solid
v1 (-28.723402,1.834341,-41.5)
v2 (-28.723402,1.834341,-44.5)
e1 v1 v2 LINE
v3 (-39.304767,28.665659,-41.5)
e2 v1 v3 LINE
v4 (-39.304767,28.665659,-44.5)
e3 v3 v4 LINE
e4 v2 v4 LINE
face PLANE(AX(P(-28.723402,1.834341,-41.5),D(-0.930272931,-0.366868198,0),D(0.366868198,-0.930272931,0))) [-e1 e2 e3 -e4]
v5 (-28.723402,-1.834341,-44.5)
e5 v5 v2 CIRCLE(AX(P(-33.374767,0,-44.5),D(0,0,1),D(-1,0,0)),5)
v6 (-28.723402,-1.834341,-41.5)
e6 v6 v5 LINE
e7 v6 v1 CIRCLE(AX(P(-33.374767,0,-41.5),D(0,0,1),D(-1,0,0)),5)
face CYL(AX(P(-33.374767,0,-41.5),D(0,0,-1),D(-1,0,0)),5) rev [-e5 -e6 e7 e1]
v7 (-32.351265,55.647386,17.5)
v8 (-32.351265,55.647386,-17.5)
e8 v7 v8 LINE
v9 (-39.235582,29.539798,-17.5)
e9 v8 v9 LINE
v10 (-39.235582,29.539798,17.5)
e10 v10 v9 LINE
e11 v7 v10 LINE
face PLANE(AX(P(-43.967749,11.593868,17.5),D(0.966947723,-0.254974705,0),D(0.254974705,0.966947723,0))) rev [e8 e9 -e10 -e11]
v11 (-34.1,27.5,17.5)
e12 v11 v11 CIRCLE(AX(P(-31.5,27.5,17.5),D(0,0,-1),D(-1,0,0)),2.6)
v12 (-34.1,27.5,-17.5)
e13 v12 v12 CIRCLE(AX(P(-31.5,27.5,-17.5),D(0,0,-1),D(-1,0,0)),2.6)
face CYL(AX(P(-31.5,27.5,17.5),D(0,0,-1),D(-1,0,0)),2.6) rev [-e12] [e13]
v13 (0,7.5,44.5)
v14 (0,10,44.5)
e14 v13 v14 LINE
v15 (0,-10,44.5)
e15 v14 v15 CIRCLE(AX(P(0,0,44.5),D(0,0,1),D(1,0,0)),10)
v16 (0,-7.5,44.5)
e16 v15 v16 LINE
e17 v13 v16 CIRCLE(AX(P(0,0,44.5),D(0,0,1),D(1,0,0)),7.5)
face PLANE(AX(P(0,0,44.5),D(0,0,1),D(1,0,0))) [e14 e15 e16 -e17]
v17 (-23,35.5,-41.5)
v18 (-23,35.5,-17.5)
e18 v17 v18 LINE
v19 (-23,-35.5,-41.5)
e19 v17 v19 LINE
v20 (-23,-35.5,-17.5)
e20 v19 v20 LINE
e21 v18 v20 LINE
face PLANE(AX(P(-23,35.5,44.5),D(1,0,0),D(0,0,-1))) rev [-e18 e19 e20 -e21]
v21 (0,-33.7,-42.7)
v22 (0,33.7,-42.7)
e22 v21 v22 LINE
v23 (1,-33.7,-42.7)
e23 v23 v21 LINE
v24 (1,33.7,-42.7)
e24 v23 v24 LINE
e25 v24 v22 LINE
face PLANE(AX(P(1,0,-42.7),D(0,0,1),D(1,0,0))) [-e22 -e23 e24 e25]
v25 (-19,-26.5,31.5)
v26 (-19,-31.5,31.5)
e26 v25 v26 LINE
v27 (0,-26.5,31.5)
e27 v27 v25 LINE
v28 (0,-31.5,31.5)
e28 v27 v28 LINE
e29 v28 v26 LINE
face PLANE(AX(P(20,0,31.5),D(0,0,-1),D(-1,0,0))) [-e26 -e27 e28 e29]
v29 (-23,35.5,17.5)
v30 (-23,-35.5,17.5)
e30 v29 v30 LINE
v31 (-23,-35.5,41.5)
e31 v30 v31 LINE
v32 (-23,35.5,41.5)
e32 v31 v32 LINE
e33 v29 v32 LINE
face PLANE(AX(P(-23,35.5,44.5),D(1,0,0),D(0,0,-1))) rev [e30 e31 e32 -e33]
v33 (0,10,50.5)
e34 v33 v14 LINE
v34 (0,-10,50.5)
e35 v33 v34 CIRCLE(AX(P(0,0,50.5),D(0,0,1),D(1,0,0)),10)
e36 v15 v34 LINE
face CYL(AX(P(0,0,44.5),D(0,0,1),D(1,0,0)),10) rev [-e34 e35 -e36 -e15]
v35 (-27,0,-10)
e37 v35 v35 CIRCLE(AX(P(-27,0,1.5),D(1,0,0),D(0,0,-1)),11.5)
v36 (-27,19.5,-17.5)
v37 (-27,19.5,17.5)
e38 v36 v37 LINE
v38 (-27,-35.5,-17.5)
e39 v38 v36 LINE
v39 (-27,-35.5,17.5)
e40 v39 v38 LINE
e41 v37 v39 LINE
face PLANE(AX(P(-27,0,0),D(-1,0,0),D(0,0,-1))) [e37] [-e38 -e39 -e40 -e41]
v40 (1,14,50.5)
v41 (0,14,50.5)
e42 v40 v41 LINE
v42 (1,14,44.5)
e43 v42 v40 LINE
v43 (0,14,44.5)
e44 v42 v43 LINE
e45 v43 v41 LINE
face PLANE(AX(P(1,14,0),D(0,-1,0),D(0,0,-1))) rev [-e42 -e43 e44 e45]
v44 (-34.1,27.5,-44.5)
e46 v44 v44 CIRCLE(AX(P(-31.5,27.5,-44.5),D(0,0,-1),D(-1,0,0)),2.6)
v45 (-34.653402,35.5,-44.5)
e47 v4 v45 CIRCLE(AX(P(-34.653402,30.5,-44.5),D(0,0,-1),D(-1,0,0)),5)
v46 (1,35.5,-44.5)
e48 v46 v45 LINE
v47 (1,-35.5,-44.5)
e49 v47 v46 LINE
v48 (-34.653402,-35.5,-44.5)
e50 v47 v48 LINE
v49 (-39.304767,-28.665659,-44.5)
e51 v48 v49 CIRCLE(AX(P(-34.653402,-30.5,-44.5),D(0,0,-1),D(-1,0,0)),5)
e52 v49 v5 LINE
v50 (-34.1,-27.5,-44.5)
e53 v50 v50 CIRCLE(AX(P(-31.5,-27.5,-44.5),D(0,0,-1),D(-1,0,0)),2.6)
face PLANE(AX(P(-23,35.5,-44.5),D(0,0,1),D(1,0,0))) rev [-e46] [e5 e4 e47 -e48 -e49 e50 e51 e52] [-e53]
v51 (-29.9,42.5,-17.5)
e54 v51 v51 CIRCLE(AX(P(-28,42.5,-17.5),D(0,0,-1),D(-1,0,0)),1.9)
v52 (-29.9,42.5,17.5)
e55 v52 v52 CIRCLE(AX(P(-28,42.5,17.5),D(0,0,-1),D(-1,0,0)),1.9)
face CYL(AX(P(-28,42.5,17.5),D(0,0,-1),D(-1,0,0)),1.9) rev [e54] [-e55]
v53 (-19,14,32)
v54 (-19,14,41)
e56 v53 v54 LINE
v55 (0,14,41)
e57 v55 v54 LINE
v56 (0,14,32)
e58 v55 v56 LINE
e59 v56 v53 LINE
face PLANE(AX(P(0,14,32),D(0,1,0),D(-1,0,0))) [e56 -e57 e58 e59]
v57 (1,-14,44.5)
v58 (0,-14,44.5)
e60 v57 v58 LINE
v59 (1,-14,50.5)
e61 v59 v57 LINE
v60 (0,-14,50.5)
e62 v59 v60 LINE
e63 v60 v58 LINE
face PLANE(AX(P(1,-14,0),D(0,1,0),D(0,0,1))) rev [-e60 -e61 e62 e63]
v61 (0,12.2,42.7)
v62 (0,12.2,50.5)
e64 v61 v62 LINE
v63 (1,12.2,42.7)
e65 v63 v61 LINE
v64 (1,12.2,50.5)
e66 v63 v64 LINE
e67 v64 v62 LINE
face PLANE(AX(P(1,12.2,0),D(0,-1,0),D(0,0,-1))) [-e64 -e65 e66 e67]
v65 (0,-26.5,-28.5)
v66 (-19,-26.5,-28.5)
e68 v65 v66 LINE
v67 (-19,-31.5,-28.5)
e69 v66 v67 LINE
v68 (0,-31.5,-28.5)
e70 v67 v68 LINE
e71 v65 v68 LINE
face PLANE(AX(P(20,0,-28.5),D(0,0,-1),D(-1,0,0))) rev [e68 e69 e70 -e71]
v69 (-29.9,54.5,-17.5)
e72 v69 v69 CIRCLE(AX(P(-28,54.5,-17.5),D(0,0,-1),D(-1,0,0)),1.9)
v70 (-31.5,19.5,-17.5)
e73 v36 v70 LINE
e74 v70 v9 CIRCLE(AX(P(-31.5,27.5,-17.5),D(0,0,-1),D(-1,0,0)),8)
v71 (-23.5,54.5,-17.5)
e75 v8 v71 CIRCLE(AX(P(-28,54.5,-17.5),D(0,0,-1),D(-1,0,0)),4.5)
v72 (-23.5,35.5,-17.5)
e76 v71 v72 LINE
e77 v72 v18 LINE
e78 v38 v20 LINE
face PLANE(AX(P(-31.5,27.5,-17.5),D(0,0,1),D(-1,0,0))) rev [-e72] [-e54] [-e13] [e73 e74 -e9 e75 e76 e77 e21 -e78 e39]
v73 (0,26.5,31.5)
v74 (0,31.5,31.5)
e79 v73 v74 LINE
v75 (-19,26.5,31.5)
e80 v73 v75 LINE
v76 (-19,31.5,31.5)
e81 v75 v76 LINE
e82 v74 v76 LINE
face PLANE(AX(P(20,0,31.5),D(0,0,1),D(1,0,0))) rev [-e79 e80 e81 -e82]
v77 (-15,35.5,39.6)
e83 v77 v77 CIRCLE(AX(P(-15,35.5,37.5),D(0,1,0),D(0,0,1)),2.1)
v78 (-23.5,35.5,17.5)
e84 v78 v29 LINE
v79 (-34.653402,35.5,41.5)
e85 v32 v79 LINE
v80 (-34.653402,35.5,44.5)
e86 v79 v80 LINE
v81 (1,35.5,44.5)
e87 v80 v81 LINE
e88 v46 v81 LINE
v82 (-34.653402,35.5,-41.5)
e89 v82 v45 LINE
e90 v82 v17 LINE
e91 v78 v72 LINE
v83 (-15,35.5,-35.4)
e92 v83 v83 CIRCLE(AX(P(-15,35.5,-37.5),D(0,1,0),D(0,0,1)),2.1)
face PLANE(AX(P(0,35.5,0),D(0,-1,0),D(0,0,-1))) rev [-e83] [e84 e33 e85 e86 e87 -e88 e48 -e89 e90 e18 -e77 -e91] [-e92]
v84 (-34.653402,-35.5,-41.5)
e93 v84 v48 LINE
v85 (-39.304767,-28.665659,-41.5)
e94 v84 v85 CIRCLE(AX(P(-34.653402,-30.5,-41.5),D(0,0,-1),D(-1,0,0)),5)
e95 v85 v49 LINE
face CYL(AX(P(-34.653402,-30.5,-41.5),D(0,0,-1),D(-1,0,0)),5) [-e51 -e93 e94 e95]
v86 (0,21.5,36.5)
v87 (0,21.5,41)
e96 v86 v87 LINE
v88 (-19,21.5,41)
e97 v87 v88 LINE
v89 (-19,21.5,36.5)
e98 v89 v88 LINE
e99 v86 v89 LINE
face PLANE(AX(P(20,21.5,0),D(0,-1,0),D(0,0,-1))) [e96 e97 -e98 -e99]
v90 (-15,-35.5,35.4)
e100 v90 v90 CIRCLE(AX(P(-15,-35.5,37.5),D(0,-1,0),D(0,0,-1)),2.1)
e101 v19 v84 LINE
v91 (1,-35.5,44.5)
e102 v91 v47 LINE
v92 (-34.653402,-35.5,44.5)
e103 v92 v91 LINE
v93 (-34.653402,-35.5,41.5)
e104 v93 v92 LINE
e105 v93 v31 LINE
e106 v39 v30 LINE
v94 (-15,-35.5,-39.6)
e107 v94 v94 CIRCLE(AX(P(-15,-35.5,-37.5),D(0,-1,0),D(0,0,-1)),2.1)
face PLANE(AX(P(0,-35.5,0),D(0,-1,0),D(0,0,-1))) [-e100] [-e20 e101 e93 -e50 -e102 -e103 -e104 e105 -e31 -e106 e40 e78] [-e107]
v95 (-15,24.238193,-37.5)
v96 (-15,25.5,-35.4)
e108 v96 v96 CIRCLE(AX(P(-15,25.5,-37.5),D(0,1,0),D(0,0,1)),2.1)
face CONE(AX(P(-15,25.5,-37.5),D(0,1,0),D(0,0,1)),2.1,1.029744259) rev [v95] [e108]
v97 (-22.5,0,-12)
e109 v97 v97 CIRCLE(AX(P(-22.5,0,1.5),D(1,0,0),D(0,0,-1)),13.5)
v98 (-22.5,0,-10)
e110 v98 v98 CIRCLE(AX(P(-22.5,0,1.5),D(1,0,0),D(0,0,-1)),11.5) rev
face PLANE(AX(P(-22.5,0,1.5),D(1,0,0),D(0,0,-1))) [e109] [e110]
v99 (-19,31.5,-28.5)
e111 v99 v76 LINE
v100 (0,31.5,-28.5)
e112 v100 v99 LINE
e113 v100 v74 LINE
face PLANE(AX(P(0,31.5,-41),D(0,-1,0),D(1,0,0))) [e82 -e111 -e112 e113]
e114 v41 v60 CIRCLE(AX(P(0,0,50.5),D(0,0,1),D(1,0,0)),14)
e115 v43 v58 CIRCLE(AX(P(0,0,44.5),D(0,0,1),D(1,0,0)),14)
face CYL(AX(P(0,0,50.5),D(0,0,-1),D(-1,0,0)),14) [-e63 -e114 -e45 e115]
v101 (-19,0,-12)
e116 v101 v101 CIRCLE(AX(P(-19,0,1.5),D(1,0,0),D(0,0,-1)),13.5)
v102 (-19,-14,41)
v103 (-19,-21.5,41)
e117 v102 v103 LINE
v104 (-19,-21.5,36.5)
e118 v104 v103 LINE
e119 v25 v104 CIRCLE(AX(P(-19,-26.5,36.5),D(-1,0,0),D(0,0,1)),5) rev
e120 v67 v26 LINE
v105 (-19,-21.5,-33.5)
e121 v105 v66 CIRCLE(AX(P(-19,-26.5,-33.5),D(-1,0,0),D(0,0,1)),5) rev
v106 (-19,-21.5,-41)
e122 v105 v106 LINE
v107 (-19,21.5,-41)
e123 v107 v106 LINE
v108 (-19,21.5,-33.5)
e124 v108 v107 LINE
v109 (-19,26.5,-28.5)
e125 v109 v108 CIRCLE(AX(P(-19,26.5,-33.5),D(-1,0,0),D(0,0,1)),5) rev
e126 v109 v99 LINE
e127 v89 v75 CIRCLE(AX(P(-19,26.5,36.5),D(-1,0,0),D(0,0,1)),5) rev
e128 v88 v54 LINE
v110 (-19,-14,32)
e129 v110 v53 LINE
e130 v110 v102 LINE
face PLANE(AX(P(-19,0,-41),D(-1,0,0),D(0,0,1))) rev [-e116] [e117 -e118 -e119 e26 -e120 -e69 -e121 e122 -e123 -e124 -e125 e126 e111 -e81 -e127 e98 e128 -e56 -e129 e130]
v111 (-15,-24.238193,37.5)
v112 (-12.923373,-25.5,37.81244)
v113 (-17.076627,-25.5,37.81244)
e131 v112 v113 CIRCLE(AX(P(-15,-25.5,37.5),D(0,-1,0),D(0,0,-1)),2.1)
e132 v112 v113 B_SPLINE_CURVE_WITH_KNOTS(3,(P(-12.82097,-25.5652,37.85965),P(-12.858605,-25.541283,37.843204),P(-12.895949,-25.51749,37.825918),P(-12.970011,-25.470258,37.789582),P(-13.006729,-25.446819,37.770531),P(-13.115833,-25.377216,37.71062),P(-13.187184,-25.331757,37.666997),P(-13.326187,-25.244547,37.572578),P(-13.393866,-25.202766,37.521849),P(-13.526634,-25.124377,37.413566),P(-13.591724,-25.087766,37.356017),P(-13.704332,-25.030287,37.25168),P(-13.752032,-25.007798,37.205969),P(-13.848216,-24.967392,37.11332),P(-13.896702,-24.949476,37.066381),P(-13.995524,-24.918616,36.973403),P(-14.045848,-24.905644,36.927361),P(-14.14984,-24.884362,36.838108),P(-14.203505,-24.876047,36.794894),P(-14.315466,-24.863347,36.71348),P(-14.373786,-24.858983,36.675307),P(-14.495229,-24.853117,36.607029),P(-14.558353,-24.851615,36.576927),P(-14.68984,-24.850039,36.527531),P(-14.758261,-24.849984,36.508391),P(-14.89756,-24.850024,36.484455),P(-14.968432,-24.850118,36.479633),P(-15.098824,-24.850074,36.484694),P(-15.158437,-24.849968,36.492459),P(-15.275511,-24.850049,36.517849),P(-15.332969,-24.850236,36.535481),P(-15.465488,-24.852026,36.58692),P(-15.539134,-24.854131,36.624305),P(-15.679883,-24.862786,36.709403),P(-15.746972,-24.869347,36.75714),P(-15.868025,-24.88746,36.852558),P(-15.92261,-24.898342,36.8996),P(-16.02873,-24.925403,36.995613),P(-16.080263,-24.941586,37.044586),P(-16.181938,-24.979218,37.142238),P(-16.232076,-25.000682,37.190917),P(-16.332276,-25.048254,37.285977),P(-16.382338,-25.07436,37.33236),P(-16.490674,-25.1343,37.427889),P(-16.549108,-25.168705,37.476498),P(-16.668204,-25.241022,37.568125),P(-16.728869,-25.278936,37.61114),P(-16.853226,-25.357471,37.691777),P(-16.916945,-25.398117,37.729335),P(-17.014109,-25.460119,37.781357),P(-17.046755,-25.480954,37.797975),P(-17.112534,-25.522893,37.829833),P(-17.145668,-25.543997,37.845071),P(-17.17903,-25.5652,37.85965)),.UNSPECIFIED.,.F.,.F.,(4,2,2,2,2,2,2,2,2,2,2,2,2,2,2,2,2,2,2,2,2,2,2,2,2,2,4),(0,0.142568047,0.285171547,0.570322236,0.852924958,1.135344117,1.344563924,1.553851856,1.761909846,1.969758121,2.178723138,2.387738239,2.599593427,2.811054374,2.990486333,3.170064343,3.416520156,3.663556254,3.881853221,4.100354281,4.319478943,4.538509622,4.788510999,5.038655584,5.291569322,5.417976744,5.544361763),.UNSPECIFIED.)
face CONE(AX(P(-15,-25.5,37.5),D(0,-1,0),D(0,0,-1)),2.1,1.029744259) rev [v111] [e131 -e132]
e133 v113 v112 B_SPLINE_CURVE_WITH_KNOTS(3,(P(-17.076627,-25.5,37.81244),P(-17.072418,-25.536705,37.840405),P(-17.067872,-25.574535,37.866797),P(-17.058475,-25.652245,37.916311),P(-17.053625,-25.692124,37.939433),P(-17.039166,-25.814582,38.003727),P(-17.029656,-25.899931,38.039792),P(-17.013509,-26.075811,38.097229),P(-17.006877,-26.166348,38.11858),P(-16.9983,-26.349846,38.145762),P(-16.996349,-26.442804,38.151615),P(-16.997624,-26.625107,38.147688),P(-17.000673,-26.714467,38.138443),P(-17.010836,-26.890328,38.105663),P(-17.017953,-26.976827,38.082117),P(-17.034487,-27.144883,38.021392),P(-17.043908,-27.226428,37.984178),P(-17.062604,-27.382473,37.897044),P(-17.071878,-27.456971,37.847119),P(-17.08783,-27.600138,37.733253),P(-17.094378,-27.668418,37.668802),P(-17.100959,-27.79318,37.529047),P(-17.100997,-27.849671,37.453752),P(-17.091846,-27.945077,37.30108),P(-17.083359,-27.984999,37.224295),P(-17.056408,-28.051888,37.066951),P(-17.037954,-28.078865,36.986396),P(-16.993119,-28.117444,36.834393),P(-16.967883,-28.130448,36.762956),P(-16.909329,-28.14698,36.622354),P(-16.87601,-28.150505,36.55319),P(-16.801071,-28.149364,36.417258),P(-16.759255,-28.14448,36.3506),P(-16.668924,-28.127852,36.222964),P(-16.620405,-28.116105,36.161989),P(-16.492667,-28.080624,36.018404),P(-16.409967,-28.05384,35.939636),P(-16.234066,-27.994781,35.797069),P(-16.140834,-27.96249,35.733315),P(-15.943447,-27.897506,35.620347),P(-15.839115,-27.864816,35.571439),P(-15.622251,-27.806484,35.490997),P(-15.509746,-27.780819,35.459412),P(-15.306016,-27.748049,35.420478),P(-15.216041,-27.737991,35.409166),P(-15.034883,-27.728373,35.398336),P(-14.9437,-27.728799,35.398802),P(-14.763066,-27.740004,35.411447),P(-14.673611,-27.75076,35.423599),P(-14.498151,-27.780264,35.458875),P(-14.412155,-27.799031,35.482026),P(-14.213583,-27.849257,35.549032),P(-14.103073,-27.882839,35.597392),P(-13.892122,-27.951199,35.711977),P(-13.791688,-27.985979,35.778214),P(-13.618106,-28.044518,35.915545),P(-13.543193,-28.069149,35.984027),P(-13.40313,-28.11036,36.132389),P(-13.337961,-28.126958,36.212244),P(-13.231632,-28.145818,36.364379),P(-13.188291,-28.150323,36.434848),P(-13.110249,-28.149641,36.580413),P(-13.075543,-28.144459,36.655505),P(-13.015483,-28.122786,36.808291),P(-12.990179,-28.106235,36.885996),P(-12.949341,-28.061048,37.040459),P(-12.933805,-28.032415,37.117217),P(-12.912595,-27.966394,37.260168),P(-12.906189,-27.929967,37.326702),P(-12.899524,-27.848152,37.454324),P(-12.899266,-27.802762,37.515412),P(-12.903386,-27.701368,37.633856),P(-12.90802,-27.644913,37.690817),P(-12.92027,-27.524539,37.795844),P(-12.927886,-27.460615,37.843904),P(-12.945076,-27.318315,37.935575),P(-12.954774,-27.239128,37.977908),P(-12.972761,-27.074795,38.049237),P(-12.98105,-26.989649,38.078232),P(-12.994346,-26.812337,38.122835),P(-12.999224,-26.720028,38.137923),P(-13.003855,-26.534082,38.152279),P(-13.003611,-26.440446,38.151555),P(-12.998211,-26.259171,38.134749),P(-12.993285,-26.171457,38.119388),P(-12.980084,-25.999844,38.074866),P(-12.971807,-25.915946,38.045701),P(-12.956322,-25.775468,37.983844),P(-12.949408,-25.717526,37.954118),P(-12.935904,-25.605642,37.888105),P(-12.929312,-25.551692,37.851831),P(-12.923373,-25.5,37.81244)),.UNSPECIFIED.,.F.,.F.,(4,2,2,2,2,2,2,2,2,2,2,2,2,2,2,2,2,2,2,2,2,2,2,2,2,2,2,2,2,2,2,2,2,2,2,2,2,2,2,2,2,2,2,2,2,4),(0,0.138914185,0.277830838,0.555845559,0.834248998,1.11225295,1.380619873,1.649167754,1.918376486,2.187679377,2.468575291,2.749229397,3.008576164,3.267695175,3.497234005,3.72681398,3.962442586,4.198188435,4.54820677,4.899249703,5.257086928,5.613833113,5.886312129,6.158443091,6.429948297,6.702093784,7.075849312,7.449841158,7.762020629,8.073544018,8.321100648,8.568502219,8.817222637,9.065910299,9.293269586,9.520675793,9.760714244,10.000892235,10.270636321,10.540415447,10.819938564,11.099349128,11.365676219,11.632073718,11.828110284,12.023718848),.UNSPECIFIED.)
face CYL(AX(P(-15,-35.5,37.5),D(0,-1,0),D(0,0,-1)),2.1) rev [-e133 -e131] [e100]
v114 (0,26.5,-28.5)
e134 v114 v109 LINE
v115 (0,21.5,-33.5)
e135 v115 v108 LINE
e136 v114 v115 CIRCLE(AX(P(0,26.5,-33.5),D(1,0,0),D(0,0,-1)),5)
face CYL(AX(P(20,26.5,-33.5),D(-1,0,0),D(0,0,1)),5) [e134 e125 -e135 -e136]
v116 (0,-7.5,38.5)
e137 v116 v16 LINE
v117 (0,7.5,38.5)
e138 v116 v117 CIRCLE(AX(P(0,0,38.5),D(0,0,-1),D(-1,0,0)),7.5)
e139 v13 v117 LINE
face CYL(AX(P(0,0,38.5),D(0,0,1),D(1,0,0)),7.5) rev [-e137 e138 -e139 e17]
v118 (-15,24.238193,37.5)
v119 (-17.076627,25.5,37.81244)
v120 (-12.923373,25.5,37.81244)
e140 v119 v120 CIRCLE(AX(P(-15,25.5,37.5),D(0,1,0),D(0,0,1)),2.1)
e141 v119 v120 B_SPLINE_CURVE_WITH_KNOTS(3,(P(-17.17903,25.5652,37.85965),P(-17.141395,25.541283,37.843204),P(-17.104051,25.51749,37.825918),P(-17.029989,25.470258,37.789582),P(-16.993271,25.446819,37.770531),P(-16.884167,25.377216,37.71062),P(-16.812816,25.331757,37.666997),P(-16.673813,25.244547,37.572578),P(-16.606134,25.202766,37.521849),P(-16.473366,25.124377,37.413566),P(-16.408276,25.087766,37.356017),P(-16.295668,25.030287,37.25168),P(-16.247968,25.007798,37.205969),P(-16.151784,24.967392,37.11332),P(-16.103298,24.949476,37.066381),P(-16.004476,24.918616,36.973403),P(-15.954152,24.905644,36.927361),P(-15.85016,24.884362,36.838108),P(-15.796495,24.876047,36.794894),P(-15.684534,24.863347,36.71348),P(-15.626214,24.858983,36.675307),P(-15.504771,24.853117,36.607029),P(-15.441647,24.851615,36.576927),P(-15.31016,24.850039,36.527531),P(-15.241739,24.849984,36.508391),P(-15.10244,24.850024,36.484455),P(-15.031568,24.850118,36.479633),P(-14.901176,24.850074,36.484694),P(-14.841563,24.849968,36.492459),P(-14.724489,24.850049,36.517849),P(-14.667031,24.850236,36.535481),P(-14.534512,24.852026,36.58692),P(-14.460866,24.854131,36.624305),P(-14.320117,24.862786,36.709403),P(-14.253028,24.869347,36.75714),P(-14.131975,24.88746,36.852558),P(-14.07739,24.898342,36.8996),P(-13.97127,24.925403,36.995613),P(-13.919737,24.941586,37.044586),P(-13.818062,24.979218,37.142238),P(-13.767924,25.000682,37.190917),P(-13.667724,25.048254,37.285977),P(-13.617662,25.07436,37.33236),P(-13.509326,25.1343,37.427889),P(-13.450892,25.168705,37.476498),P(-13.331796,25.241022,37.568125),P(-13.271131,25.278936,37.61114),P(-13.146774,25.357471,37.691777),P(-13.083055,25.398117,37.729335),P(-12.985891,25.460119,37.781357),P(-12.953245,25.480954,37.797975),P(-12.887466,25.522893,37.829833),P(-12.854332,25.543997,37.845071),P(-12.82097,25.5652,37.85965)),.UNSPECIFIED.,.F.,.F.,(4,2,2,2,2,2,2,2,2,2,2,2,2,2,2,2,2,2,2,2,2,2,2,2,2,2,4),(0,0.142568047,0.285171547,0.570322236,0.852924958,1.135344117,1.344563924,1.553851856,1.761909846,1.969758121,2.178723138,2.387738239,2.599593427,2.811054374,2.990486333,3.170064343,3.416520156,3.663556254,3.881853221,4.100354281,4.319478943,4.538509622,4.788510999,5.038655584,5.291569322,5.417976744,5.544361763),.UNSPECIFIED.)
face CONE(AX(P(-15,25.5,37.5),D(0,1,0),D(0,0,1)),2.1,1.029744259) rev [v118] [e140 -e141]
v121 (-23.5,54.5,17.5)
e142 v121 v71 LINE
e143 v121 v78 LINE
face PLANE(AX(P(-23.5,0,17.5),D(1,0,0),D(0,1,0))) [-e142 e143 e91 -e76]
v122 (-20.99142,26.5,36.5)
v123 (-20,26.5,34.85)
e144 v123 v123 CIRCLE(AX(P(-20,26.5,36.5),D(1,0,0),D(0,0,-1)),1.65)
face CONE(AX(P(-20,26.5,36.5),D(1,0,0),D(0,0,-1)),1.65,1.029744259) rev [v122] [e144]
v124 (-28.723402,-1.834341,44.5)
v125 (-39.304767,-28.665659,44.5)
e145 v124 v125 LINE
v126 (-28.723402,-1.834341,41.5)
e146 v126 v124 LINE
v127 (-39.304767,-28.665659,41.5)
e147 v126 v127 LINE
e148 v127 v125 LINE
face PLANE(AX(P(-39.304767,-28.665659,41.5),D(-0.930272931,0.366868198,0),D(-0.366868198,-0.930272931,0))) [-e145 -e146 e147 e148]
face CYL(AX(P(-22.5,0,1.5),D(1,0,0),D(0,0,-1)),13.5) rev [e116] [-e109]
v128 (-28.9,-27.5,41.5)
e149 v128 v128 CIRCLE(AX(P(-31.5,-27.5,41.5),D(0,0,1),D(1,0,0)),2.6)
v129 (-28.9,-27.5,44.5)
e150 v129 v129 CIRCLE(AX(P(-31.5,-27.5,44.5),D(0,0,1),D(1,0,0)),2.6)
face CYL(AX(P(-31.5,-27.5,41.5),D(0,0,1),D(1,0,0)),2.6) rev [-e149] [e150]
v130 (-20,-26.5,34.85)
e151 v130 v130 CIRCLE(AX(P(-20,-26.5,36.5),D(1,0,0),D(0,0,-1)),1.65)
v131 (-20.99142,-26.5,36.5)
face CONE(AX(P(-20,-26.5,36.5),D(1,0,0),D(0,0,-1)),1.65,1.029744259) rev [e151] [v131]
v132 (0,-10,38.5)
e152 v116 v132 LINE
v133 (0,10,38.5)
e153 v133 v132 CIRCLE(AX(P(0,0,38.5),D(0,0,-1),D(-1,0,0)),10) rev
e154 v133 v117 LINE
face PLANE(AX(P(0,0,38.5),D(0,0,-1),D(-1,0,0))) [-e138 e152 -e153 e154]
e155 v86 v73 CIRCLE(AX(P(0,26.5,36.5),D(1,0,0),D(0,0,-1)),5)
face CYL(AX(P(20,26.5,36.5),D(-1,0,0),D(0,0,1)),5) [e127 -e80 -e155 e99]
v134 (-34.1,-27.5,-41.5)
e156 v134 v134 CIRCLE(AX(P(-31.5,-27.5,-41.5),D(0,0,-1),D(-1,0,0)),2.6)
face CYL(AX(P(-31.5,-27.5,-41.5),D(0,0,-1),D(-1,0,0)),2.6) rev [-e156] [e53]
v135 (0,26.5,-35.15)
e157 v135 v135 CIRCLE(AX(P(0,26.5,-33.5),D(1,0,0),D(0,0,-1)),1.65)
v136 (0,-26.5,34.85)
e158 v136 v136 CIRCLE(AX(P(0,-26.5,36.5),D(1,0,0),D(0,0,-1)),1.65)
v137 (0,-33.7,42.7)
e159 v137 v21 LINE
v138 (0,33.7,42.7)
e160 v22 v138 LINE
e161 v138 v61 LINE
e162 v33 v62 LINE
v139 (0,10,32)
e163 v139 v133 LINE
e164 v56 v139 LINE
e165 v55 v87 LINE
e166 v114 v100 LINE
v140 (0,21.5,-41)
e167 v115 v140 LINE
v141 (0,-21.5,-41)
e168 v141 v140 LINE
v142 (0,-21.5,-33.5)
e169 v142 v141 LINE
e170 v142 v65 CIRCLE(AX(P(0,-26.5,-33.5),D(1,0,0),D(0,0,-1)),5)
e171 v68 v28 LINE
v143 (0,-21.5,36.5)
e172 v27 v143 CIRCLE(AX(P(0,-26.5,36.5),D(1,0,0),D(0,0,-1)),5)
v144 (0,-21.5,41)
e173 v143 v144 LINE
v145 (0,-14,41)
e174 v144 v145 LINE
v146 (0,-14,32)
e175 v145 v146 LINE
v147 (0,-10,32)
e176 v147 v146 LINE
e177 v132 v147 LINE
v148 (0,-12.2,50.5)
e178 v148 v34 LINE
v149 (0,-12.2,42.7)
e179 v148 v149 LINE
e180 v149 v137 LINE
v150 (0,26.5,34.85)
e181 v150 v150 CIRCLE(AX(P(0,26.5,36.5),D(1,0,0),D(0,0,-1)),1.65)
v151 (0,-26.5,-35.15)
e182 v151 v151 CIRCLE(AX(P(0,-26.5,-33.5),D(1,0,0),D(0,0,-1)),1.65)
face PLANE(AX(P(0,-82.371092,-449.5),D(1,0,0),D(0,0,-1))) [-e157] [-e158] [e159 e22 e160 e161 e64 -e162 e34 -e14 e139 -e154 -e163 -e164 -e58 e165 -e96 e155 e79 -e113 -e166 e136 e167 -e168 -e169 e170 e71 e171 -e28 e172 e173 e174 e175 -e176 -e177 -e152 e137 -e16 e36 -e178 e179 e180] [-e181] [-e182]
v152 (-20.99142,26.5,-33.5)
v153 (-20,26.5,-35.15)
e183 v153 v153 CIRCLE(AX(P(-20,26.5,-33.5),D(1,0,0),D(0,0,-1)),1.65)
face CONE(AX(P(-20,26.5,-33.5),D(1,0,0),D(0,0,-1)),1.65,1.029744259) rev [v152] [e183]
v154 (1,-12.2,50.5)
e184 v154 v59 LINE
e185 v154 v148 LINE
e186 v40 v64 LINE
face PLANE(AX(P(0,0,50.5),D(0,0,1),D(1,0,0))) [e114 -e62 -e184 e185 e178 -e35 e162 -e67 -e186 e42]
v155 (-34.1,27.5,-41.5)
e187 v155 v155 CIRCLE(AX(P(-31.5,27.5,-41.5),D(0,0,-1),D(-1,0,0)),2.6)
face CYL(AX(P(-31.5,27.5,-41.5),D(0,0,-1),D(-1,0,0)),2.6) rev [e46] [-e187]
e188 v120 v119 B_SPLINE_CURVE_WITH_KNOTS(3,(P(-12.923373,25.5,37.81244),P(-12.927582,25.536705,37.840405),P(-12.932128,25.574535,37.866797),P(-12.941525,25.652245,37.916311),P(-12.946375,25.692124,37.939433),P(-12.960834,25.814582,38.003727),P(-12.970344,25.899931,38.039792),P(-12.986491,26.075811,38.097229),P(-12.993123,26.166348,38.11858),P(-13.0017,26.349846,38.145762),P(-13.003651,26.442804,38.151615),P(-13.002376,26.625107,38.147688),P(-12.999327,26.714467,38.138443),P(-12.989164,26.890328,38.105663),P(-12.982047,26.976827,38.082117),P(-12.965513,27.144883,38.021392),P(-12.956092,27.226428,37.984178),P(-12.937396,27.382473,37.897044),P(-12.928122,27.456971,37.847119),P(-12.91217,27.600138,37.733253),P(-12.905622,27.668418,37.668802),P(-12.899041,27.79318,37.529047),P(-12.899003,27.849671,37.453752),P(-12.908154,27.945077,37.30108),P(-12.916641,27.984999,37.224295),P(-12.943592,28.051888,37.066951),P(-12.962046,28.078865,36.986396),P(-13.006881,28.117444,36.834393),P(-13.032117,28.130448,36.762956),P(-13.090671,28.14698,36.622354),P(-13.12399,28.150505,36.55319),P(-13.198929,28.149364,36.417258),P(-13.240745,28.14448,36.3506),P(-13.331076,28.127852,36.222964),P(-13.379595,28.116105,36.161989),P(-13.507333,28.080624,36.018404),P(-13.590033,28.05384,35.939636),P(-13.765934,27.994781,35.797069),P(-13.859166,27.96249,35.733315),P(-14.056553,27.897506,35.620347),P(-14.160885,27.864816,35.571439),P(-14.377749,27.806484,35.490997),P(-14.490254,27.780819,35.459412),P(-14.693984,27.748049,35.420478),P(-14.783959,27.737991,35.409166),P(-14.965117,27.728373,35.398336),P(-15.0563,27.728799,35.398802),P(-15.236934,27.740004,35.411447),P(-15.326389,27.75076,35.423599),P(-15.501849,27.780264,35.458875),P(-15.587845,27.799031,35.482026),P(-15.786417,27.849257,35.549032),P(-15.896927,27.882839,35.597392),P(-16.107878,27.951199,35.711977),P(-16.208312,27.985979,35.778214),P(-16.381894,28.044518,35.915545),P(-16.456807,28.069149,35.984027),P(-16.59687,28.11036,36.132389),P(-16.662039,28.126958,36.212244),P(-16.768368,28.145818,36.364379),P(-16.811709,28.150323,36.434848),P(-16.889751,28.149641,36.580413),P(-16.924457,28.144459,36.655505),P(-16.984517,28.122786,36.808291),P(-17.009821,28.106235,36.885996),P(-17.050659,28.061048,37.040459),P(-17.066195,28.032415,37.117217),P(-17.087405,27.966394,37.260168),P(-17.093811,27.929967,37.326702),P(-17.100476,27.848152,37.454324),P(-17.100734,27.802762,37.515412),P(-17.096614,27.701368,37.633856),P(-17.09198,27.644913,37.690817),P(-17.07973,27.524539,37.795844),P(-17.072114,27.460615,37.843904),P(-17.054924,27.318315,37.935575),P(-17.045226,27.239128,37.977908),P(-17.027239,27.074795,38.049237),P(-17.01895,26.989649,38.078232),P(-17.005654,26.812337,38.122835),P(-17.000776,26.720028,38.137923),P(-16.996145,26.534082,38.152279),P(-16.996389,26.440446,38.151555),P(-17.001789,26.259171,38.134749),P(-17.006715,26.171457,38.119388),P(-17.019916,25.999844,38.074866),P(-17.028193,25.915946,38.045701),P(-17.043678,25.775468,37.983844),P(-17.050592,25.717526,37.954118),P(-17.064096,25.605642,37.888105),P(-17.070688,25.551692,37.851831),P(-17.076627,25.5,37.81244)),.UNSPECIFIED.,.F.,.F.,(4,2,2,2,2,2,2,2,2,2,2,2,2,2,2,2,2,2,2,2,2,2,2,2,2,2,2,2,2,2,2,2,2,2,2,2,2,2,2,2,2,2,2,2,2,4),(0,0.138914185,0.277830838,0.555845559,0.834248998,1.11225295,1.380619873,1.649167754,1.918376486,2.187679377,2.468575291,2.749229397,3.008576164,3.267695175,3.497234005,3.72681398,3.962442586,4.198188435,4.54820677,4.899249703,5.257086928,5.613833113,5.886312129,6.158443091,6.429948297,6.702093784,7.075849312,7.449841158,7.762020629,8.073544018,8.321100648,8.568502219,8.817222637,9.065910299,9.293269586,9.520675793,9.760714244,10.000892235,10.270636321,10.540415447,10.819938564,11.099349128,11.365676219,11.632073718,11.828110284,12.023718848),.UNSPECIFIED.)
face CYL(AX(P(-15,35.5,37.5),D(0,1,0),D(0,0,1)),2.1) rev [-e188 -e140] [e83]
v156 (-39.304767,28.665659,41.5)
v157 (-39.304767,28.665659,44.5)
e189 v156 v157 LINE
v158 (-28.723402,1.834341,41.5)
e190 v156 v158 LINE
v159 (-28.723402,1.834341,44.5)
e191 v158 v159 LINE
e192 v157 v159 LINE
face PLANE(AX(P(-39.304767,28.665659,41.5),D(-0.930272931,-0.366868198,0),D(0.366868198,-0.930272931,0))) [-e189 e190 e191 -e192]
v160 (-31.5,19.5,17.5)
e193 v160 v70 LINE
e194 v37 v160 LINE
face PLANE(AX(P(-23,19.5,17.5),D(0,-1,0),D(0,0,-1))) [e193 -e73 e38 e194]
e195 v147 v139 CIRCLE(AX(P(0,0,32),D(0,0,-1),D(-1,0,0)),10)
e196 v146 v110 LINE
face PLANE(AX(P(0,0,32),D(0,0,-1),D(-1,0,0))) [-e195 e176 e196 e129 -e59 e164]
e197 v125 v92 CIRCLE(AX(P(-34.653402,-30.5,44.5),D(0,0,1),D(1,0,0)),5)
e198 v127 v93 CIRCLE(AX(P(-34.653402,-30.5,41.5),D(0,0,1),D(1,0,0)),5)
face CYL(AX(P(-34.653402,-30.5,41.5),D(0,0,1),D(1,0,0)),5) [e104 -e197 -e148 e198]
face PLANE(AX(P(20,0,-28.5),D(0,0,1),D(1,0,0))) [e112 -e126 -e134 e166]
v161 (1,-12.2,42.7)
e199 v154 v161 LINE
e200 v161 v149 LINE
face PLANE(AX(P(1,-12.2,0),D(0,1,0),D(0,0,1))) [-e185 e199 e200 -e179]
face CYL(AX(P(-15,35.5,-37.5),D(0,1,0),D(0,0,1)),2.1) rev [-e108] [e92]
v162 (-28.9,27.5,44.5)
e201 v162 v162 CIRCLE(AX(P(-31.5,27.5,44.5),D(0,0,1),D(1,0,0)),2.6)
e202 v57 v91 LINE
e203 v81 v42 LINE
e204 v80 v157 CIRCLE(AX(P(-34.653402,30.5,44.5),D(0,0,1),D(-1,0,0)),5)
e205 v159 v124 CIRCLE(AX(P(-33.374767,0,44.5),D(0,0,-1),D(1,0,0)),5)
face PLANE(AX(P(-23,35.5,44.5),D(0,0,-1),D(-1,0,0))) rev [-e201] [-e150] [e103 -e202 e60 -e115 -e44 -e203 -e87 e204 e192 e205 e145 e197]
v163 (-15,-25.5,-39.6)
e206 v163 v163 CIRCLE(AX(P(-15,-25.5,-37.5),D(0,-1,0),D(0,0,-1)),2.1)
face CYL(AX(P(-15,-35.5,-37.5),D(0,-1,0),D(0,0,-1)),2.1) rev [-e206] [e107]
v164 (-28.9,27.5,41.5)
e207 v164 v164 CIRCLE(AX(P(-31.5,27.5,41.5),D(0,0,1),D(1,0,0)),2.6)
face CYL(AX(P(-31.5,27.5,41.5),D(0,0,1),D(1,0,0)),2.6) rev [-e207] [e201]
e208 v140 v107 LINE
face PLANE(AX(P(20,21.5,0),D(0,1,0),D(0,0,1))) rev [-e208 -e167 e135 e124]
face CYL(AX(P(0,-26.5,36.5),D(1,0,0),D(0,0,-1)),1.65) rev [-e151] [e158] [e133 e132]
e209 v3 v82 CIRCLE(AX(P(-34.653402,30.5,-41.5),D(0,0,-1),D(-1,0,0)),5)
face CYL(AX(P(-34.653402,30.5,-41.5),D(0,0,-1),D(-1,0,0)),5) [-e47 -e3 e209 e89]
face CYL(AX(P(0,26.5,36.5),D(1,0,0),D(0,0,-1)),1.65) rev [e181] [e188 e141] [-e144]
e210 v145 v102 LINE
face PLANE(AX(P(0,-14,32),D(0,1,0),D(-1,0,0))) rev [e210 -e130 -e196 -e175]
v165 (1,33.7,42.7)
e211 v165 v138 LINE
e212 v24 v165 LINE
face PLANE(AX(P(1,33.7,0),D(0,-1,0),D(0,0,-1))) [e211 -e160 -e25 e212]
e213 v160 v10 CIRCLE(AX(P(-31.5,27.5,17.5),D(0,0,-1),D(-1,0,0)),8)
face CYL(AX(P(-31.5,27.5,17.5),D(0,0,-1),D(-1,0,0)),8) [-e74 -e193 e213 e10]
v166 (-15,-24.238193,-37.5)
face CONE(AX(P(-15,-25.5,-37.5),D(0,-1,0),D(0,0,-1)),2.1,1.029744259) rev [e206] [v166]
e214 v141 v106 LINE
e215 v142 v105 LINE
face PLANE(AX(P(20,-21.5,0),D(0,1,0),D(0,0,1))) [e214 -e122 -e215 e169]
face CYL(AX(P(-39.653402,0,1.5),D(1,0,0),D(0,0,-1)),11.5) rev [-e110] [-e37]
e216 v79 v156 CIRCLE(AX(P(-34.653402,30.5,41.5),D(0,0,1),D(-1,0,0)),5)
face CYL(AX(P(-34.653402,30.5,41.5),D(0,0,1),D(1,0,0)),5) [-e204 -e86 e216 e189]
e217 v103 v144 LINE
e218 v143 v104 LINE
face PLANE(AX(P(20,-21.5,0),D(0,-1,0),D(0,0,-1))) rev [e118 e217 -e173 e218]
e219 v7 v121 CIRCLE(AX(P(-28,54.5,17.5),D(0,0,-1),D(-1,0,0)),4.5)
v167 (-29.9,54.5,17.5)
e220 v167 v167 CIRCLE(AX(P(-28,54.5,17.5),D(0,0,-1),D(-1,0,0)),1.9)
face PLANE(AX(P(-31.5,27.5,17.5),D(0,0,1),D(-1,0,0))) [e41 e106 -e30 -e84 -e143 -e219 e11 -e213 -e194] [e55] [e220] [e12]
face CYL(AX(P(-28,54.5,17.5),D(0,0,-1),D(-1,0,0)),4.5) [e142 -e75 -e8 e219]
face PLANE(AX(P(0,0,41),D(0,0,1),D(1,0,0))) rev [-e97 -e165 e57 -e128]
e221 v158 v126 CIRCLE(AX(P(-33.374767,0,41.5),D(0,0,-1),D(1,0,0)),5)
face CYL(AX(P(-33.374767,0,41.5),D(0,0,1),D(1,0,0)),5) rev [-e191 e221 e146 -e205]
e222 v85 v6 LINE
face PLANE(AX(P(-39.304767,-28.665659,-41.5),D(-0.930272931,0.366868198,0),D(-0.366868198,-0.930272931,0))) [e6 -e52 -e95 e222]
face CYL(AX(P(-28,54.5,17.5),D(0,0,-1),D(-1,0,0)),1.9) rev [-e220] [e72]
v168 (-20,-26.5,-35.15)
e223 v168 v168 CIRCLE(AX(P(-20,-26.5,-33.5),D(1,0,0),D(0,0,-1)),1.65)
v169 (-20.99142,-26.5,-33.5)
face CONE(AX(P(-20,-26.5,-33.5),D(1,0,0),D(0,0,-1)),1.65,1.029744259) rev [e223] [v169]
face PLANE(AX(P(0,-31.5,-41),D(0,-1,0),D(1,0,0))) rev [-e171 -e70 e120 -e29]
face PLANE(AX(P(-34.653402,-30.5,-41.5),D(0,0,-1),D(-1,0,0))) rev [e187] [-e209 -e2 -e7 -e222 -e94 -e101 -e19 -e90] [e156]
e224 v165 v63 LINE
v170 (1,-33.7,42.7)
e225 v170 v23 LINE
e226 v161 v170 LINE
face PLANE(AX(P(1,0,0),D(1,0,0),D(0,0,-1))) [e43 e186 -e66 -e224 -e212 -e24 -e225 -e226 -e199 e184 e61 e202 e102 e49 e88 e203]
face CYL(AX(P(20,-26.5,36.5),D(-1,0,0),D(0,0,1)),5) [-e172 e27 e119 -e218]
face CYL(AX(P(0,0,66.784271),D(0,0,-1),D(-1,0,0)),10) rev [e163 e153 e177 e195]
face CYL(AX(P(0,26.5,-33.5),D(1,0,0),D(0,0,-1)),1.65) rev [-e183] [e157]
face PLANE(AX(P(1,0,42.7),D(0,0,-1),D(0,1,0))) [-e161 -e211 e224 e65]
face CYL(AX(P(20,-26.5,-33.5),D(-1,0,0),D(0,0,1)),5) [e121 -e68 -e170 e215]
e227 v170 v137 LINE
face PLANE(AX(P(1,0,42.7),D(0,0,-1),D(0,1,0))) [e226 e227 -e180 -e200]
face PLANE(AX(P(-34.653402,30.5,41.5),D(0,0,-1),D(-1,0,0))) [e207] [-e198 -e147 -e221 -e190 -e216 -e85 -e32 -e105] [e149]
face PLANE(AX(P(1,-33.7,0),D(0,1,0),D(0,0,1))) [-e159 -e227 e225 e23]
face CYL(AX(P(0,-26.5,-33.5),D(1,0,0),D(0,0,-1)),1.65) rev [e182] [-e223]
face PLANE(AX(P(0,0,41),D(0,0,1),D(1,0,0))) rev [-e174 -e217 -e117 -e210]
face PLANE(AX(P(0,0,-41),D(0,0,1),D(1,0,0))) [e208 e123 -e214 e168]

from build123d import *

# Parameters (mm, degrees)
SKETCH_1_W             = 46
SKETCH_1_H             = 89
EXTRUDE_1_DEPTH        = 35.5
SKETCH_3_R             = 2.6
EXTRUDE_2_DEPTH        = 3
EXTRUDE_START          = -3
SKETCH_4_R             = 2.6
EXTRUDE_3_DEPTH        = 3
SKETCH_5_R             = 14
EXTRUDE_4_DEPTH        = 6
SKETCH_6_R             = 11.5
CUT_EXTRUDE_1_DEPTH    = 88.954242748
SKETCH_7_R             = 2.6
EXTRUDE_5_DEPTH        = 17.5
SKETCH_8_R             = 1.9
SKETCH_8_R_2           = 4.5
EXTRUDE_6_DEPTH        = 17.5
SKETCH_9_R             = 2
CUT_EXTRUDE_2_DEPTH    = 115.249255194
SKETCH_10_R            = 10
CUT_EXTRUDE_3_DEPTH    = 6
SKETCH_11_R            = 7.5
CUT_EXTRUDE_4_DEPTH    = 6
SKETCH_12_R            = 9.5
CUT_EXTRUDE_5_DEPTH    = 6
SKETCH_15_W            = 38
SKETCH_15_H            = 63
CUT_EXTRUDE_7_DEPTH    = 41
EXTRUDE_START_2        = 9
SKETCH_16_R            = 14
SKETCH_16_R_2          = 9.5
EXTRUDE_7_DEPTH        = 9
SKETCH_17_R            = 5
EXTRUDE_10_DEPTH       = 20
EXTRUDE_START_3        = 4
SKETCH_18_W            = 35
SKETCH_18_H            = 55
SKETCH_18_R            = 11.5
EXTRUDE_11_DEPTH       = 4
SKETCH_19_R            = 13.5
CUT_EXTRUDE_10_DEPTH   = 4
CUT_EXTRUDE_START      = -3.5
SKETCH_20_R            = 13.5
CUT_EXTRUDE_11_DEPTH   = 3.5
SKETCH_22_W            = 152.706647992
SKETCH_22_H            = 164.74218493
CUT_EXTRUDE_14_DEPTH   = 500
EXTRUDE_12_DEPTH       = 1
HOLE_WIZARD_M4_1_D     = 3.3
HOLE_WIZARD_M4_1_DEPTH = 20
HOLE_WIZARD_M4_1_TIP   = 0.991420021
EXTRUDE_14_DEPTH       = 2.5
CUT_EXTRUDE_START_2    = -6.5
SKETCH_28_R            = 10
CUT_EXTRUDE_15_DEPTH   = 6.5


# Read off the part's stored shape, not the designer's step: M5 螺纹孔1
with BuildPart() as part:
    # 草图1 → 凸台-拉伸1 (new, symmetric)
    with BuildSketch(Plane(origin=(0, 0, 0), x_dir=(1, 0, 0), z_dir=(0, 1, 0))):
        Rectangle(SKETCH_1_W, SKETCH_1_H)
    extrude(amount=EXTRUDE_1_DEPTH, both=True)

    # 草图3 → 凸台-拉伸2 (add)
    # profile 1 of 2: a face of its own
    with BuildSketch(Plane.XY.offset(44.5)):
        with BuildLine():
            Line((23, 35.5), (34.653402281, 35.5))
            ThreePointArc((34.653402281, 35.5), (38.786905937, 33.313209471), (39.304766934, 28.66565901))
            Line((39.304766934, 28.66565901), (28.72340208, 1.83434099))
            ThreePointArc((28.72340208, 1.83434099), (28.374766733, 0), (28.72340208, -1.83434099))
            Line((28.72340208, -1.83434099), (39.304766934, -28.66565901))
            ThreePointArc((39.304766934, -28.66565901), (38.786905937, -33.313209471), (34.653402281, -35.5))
            Line((34.653402281, -35.5), (23, -35.5))
            Line((23, -35.5), (23, 35.5))
        make_face()
        with Locations((31.5, 27.5)):
            Circle(SKETCH_3_R, mode=Mode.SUBTRACT)
        with Locations((31.5, -27.5)):
            Circle(SKETCH_3_R, mode=Mode.SUBTRACT)
    # profile 2 of 2: a face of its own
    with BuildSketch(Plane.XY.offset(44.5)):
        with BuildLine():
            Line((-23, -35.5), (-23, 35.5))
            Line((-23, 35.5), (-34.653402281, 35.5))
            ThreePointArc((-34.653402281, 35.5), (-38.786905937, 33.313209471), (-39.304766934, 28.66565901))
            Line((-39.304766934, 28.66565901), (-28.72340208, 1.83434099))
            ThreePointArc((-28.72340208, 1.83434099), (-28.374766733, 0), (-28.72340208, -1.83434099))
            Line((-28.72340208, -1.83434099), (-39.304766934, -28.66565901))
            ThreePointArc((-39.304766934, -28.66565901), (-38.786905937, -33.313209471), (-34.653402281, -35.5))
            Line((-34.653402281, -35.5), (-23, -35.5))
        make_face()
        with Locations((-31.5, -27.5)):
            Circle(SKETCH_3_R, mode=Mode.SUBTRACT)
        with Locations((-31.5, 27.5)):
            Circle(SKETCH_3_R, mode=Mode.SUBTRACT)
    extrude(amount=-EXTRUDE_2_DEPTH)

    # 草图4 → 凸台-拉伸3 (add)
    # profile 1 of 2: a face of its own
    with BuildSketch(Plane(origin=(0, 0, -44.5), x_dir=(-1, 0, 0), z_dir=(0, 0, -1)).offset(EXTRUDE_START)):
        with BuildLine():
            Line((39.304766934, -28.66565901), (28.72340208, -1.83434099))
            ThreePointArc((28.72340208, -1.83434099), (28.374766733, 0), (28.72340208, 1.83434099))
            Line((28.72340208, 1.83434099), (39.304766934, 28.66565901))
            ThreePointArc((39.304766934, 28.66565901), (38.786905937, 33.313209471), (34.653402281, 35.5))
            Line((34.653402281, 35.5), (23, 35.5))
            Line((23, 35.5), (23, -35.5))
            Line((23, -35.5), (34.653402281, -35.5))
            ThreePointArc((34.653402281, -35.5), (38.786905937, -33.313209471), (39.304766934, -28.66565901))
        make_face()
        with Locations(Location((31.5, 27.5, 0), (0, 0, 180))):
            Circle(SKETCH_4_R, mode=Mode.SUBTRACT)
        with Locations(Location((31.5, -27.5, 0), (0, 0, 180))):
            Circle(SKETCH_4_R, mode=Mode.SUBTRACT)
    # profile 2 of 2: a face of its own
    with BuildSketch(Plane(origin=(0, 0, -44.5), x_dir=(-1, 0, 0), z_dir=(0, 0, -1)).offset(EXTRUDE_START)):
        with BuildLine():
            Line((-23, 35.5), (-34.653402281, 35.5))
            ThreePointArc((-34.653402281, 35.5), (-38.786905937, 33.313209471), (-39.304766934, 28.66565901))
            Line((-39.304766934, 28.66565901), (-28.72340208, 1.83434099))
            ThreePointArc((-28.72340208, 1.83434099), (-28.374766733, 0), (-28.72340208, -1.83434099))
            Line((-28.72340208, -1.83434099), (-39.304766934, -28.66565901))
            ThreePointArc((-39.304766934, -28.66565901), (-38.786905937, -33.313209471), (-34.653402281, -35.5))
            Line((-34.653402281, -35.5), (-23, -35.5))
            Line((-23, -35.5), (-23, 35.5))
        make_face()
        with Locations(Location((-31.5, -27.5, 0), (0, 0, 180))):
            Circle(SKETCH_4_R, mode=Mode.SUBTRACT)
        with Locations(Location((-31.5, 27.5, 0), (0, 0, 180))):
            Circle(SKETCH_4_R, mode=Mode.SUBTRACT)
    extrude(amount=EXTRUDE_3_DEPTH)

    # 草图5 → 凸台-拉伸4 (add)
    with BuildSketch(Plane.XY.offset(44.5)):
        Circle(SKETCH_5_R)
    extrude(amount=EXTRUDE_4_DEPTH)

    # 草图6 → 切除-拉伸1 (cut, through all)
    with BuildSketch(Plane(origin=(23, 0, 0), x_dir=(0, 0, -1), z_dir=(1, 0, 0))):
        with Locations((-1.5, 0)):
            Circle(SKETCH_6_R)
    extrude(amount=-CUT_EXTRUDE_1_DEPTH, mode=Mode.SUBTRACT)

    # 草图7 → 凸台-拉伸5 (add, symmetric)
    with BuildSketch(Plane.XY):
        with BuildLine():
            Line((23, 19.5), (23, 35.5))
            Line((23, 35.5), (31.5, 35.5))
            ThreePointArc((31.5, 35.5), (39.5, 27.5), (31.5, 19.5))
            Line((31.5, 19.5), (23, 19.5))
        make_face()
        with Locations((31.5, 27.5)):
            Circle(SKETCH_7_R, mode=Mode.SUBTRACT)
    extrude_5 = extrude(amount=EXTRUDE_5_DEPTH, both=True)

    # 镜向1: 凸台-拉伸5 across plane
    add(extrude_5.mirror(Plane(origin=(0, 0, 0), x_dir=(0, 0, 1), z_dir=(1, 0, 0))))

    # 草图8 → 凸台-拉伸6 (add, symmetric)
    # profile 1 of 2: a face of its own
    with BuildSketch(Plane.XY):
        with BuildLine():
            Line((39.235581788, 29.539797639), (32.351264755, 55.647386172))
            ThreePointArc((32.351264755, 55.647386172), (32.46266128, 55.078493129), (32.5, 54.5))
            ThreePointArc((32.5, 54.5), (28, 50), (23.5, 54.5))
            Line((23.5, 54.5), (23.5, 35.5))
            Line((23.5, 35.5), (31.5, 35.5))
            ThreePointArc((31.5, 35.5), (36.382705136, 33.837127942), (39.235581788, 29.539797639))
        make_face()
        with Locations((28, 42.5)):
            Circle(SKETCH_8_R, mode=Mode.SUBTRACT)
    # profile 2 of 2: a face of its own
    with BuildSketch(Plane.XY):
        with Locations((28, 54.5)):
            Circle(SKETCH_8_R_2)
        with Locations((28, 54.5)):
            Circle(SKETCH_8_R, mode=Mode.SUBTRACT)
    extrude_6 = extrude(amount=EXTRUDE_6_DEPTH, both=True)

    # 镜向2: 凸台-拉伸5, 凸台-拉伸6 across plane
    add(extrude_5.mirror(Plane(origin=(0, 0, 0), x_dir=(0, 0, 1), z_dir=(1, 0, 0))))
    add(extrude_6.mirror(Plane(origin=(0, 0, 0), x_dir=(0, 0, 1), z_dir=(1, 0, 0))))

    # 草图9 → 切除-拉伸2 (cut, through all)
    with BuildSketch(Plane.XZ.offset(35.5)):
        with Locations(Location((15, -37.5, 0), (0, 0, 270))):
            Circle(SKETCH_9_R)
        with Locations(Location((-15, -37.5, 0), (0, 0, 270))):
            Circle(SKETCH_9_R)
        with Locations(Location((-15, 37.5, 0), (0, 0, 270))):
            Circle(SKETCH_9_R)
        with Locations(Location((15, 37.5, 0), (0, 0, 270))):
            Circle(SKETCH_9_R)
    extrude(amount=-CUT_EXTRUDE_2_DEPTH, mode=Mode.SUBTRACT)

    # 草图10 → 切除-拉伸3 (cut)
    with BuildSketch(Plane.XY.offset(50.5)):
        Circle(SKETCH_10_R)
    extrude(amount=-CUT_EXTRUDE_3_DEPTH, mode=Mode.SUBTRACT)

    # 草图11 → 切除-拉伸4 (cut)
    with BuildSketch(Plane.XY.offset(44.5)):
        Circle(SKETCH_11_R)
    extrude(amount=-CUT_EXTRUDE_4_DEPTH, mode=Mode.SUBTRACT)

    # 草图12 → 切除-拉伸5 (cut)
    with BuildSketch(Plane.XY.offset(38.5)):
        Circle(SKETCH_12_R)
    extrude(amount=-CUT_EXTRUDE_5_DEPTH, mode=Mode.SUBTRACT)

    # 草图15 → 切除-拉伸7 (cut, symmetric)
    with BuildSketch(Plane.XY):
        Rectangle(SKETCH_15_W, SKETCH_15_H)
    extrude(amount=CUT_EXTRUDE_7_DEPTH, both=True, mode=Mode.SUBTRACT)

    # 草图16 → 凸台-拉伸7 (add)
    # profile 1 of 3: a face of its own
    with BuildSketch(Plane(origin=(0, 0, 41), x_dir=(-1, 0, 0), z_dir=(0, 0, -1)).offset(EXTRUDE_START_2)):
        with Locations(Location((0, 0, 0), (0, 0, 180))):
            Circle(SKETCH_16_R)
        Circle(SKETCH_16_R_2, mode=Mode.SUBTRACT)
    # profile 2 of 3: a face of its own
    with BuildSketch(Plane(origin=(0, 0, 41), x_dir=(-1, 0, 0), z_dir=(0, 0, -1)).offset(EXTRUDE_START_2)):
        with BuildLine():
            Line((-19, 14), (-19, -14))
            Line((-19, -14), (0, -14))
            ThreePointArc((0, -14), (-14, 0), (0, 14))
            Line((0, 14), (-19, 14))
        make_face()
    # profile 3 of 3: a face of its own
    with BuildSketch(Plane(origin=(0, 0, 41), x_dir=(-1, 0, 0), z_dir=(0, 0, -1)).offset(EXTRUDE_START_2)):
        with BuildLine():
            ThreePointArc((14, 0), (9.899494937, -9.899494937), (0, -14))
            Line((0, -14), (19, -14))
            Line((19, -14), (19, 14))
            Line((19, 14), (0, 14))
            ThreePointArc((0, 14), (9.899494937, 9.899494937), (14, 0))
        make_face()
    extrude(amount=-EXTRUDE_7_DEPTH)

    # 草图17 → 凸台-拉伸10 (add, symmetric)
    with BuildSketch(Plane(origin=(0, 0, 0), x_dir=(0, 0, -1), z_dir=(1, 0, 0))):
        with BuildLine():
            ThreePointArc((-41, 28.679449472), (-39.155442773, 30.736581603), (-36.5, 31.5))
            Line((-36.5, 31.5), (-41, 31.5))
            Line((-41, 31.5), (-41, 28.679449472))
        make_face()
        with BuildLine():
            ThreePointArc((-36.5, 21.5), (-32.964466094, 22.964466094), (-31.5, 26.5))
            ThreePointArc((-31.5, 26.5), (-32.964466094, 30.035533906), (-36.5, 31.5))
            ThreePointArc((-36.5, 31.5), (-39.155442773, 30.736581603), (-41, 28.679449472))
            Line((-41, 28.679449472), (-41, 24.320550528))
            ThreePointArc((-41, 24.320550528), (-39.155442773, 22.263418397), (-36.5, 21.5))
        make_face()
        with BuildLine():
            ThreePointArc((-41, 28.679449472), (-41.5, 26.5), (-41, 24.320550528))
            Line((-41, 24.320550528), (-41, 28.679449472))
        make_face()
        with BuildLine():
            ThreePointArc((-36.5, 31.5), (-32.964466094, 30.035533906), (-31.5, 26.5))
            Line((-31.5, 26.5), (-31.5, 31.5))
            Line((-31.5, 31.5), (-36.5, 31.5))
        make_face()
        with BuildLine():
            Line((-41, 21.5), (-36.5, 21.5))
            ThreePointArc((-36.5, 21.5), (-39.155442773, 22.263418397), (-41, 24.320550528))
            Line((-41, 24.320550528), (-41, 21.5))
        make_face()
        with Locations((33.5, 26.5)):
            Circle(SKETCH_17_R)
        with BuildLine():
            Line((33.5, 31.5), (28.5, 31.5))
            Line((28.5, 31.5), (28.5, 26.5))
            ThreePointArc((28.5, 26.5), (29.964466094, 30.035533906), (33.5, 31.5))
        make_face()
        with BuildLine():
            Line((41, 31.5), (33.5, 31.5))
            ThreePointArc((33.5, 31.5), (37.035533906, 30.035533906), (38.5, 26.5))
            ThreePointArc((38.5, 26.5), (37.035533906, 22.964466094), (33.5, 21.5))
            Line((33.5, 21.5), (41, 21.5))
            Line((41, 21.5), (41, 31.5))
        make_face()
        with Locations((33.5, -26.5)):
            Circle(SKETCH_17_R)
        with BuildLine():
            Line((28.5, -31.5), (33.5, -31.5))
            ThreePointArc((33.5, -31.5), (29.964466094, -30.035533906), (28.5, -26.5))
            Line((28.5, -26.5), (28.5, -31.5))
        make_face()
        with BuildLine():
            Line((41, -31.5), (41, -21.5))
            Line((41, -21.5), (33.5, -21.5))
            ThreePointArc((33.5, -21.5), (37.035533906, -22.964466094), (38.5, -26.5))
            ThreePointArc((38.5, -26.5), (37.035533906, -30.035533906), (33.5, -31.5))
            Line((33.5, -31.5), (41, -31.5))
        make_face()
        with BuildLine():
            Line((-31.5, -31.5), (-31.5, -26.5))
            ThreePointArc((-31.5, -26.5), (-32.964466094, -30.035533906), (-36.5, -31.5))
            Line((-36.5, -31.5), (-31.5, -31.5))
        make_face()
        with BuildLine():
            ThreePointArc((-31.5, -26.5), (-32.964466094, -22.964466094), (-36.5, -21.5))
            ThreePointArc((-36.5, -21.5), (-39.155442773, -22.263418397), (-41, -24.320550528))
            Line((-41, -24.320550528), (-41, -28.679449472))
            ThreePointArc((-41, -28.679449472), (-39.155442773, -30.736581603), (-36.5, -31.5))
            ThreePointArc((-36.5, -31.5), (-32.964466094, -30.035533906), (-31.5, -26.5))
        make_face()
        with BuildLine():
            Line((-41, -28.679449472), (-41, -24.320550528))
            ThreePointArc((-41, -24.320550528), (-41.5, -26.5), (-41, -28.679449472))
        make_face()
        with BuildLine():
            Line((-36.5, -21.5), (-41, -21.5))
            Line((-41, -21.5), (-41, -24.320550528))
            ThreePointArc((-41, -24.320550528), (-39.155442773, -22.263418397), (-36.5, -21.5))
        make_face()
        with BuildLine():
            ThreePointArc((-36.5, -31.5), (-39.155442773, -30.736581603), (-41, -28.679449472))
            Line((-41, -28.679449472), (-41, -31.5))
            Line((-41, -31.5), (-36.5, -31.5))
        make_face()
    extrude(amount=EXTRUDE_10_DEPTH, both=True)

    # 草图18 → 凸台-拉伸11 (add)
    with BuildSketch(Plane(origin=(23, 0, 0), x_dir=(0, 0, -1), z_dir=(1, 0, 0)).offset(EXTRUDE_START_3)):
        with Locations((0, -8)):
            Rectangle(SKETCH_18_W, SKETCH_18_H)
        with Locations((-1.5, 0)):
            Circle(SKETCH_18_R, mode=Mode.SUBTRACT)
    extrude_11 = extrude(amount=-EXTRUDE_11_DEPTH)

    # 镜向3: 凸台-拉伸11 across plane
    add(extrude_11.mirror(Plane(origin=(0, 0, 0), x_dir=(0, 0, 1), z_dir=(1, 0, 0))))

    # 草图19 → 切除-拉伸10 (cut)
    with BuildSketch(Plane.ZY.offset(-19)):
        with Locations(Location((1.5, 0, 0), (0, 0, 270))):
            Circle(SKETCH_19_R)
    extrude(amount=-CUT_EXTRUDE_10_DEPTH, mode=Mode.SUBTRACT)

    # 草图20 → 切除-拉伸11 (cut)
    with BuildSketch(Plane(origin=(-19, 0, 0), x_dir=(0, 0, -1), z_dir=(1, 0, 0)).offset(CUT_EXTRUDE_START)):
        with Locations(Location((-1.5, 0, 0), (0, 0, 270))):
            Circle(SKETCH_20_R)
    extrude(amount=CUT_EXTRUDE_11_DEPTH, mode=Mode.SUBTRACT)

    # 草图22 → 切除-拉伸14 (cut)
    with BuildSketch(Plane.XY.offset(50.5)):
        with Locations((76.353323996, 0)):
            Rectangle(SKETCH_22_W, SKETCH_22_H)
    extrude(amount=-CUT_EXTRUDE_14_DEPTH, mode=Mode.SUBTRACT)

    # 草图23 → 凸台-拉伸12 (add)
    with BuildSketch(Plane(origin=(0, 0, 0), x_dir=(0, 0, -1), z_dir=(1, 0, 0))):
        Polygon((-50.5, 14), (-50.5, 12.2), (-42.7, 12.2), (-42.7, 33.7), (42.7, 33.7), (42.7, -33.7), (-42.7, -33.7), (-42.7, -12.2), (-50.5, -12.2), (-50.5, -14), (-44.5, -14), (-44.5, -35.5), (44.5, -35.5), (44.5, 35.5), (-44.5, 35.5), (-44.5, 14), align=None)
    extrude(amount=EXTRUDE_12_DEPTH)

    # M4 螺纹孔1
    with Locations(Plane(origin=(0, -26.5, -33.5), x_dir=(0, 0, 1), z_dir=(1, 0, 0))):
        with Locations((0, 0), (70, 0), (70, -53), (0, -53)):
            Hole(HOLE_WIZARD_M4_1_D / 2, depth=HOLE_WIZARD_M4_1_DEPTH)
            with Locations((0, 0, -(HOLE_WIZARD_M4_1_DEPTH + HOLE_WIZARD_M4_1_TIP / 2))):  # 118° drill point
                Cone(0, HOLE_WIZARD_M4_1_D / 2, HOLE_WIZARD_M4_1_TIP, mode=Mode.SUBTRACT)

    # M5 螺纹孔1 outline → M5 螺纹孔1 (revolve, cut)
    with BuildSketch(Plane(origin=(-15, 0, -37.5), x_dir=(1, 0, 0), z_dir=(0, 0, 1))):
        Polygon((0, -24.2381927), (0, -31.5), (2, -31.5), (2, -35.5), (2.1, -35.5), (2.1, -25.5), align=None)
        Polygon((0, 31.5), (0, 24.2381927), (2.1, 25.5), (2.1, 35.5), (2, 35.5), (2, 31.5), align=None)
    revolve(axis=Axis((-15, 0, -37.5), (0, 1, 0)), mode=Mode.SUBTRACT)

    # Hole Wizard M5 _1 2 outline → Hole Wizard M5 _1 2 (revolve, cut)
    with BuildSketch(Plane(origin=(-15, 0, 37.5), x_dir=(1, 0, 0), z_dir=(0, 0, 1))):
        Polygon((0, -24.2381927), (0, -31.5), (2, -31.5), (2, -35.5), (2.100000029, -35.5), (2.10000001, -25.500000006), align=None)
        Polygon((0, 31.5), (0, 24.2381927), (2.10000001, 25.500000006), (2.100000015, 35.5), (2, 35.5), (2, 31.5), align=None)
    revolve(axis=Axis((-15, 0, 37.5), (0, 1, 0)), mode=Mode.SUBTRACT)

    # 草图27 → 凸台-拉伸14 (add)
    with BuildSketch(Plane(origin=(0, 0, 41), x_dir=(-1, 0, 0), z_dir=(0, 0, -1))):
        with BuildLine():
            Line((0, -7.5), (0, -9.5))
            ThreePointArc((0, -9.5), (9.5, 0), (0, 9.5))
            Line((0, 9.5), (0, 7.5))
            ThreePointArc((0, 7.5), (7.5, 0), (0, -7.5))
        make_face()
    extrude(amount=EXTRUDE_14_DEPTH)

    # 草图28 → 切除-拉伸15 (cut)
    with BuildSketch(Plane(origin=(0, 0, 32), x_dir=(-1, 0, 0), z_dir=(0, 0, -1)).offset(CUT_EXTRUDE_START_2)):
        Circle(SKETCH_28_R)
    extrude(amount=CUT_EXTRUDE_15_DEPTH, mode=Mode.SUBTRACT)


solid = part.part
